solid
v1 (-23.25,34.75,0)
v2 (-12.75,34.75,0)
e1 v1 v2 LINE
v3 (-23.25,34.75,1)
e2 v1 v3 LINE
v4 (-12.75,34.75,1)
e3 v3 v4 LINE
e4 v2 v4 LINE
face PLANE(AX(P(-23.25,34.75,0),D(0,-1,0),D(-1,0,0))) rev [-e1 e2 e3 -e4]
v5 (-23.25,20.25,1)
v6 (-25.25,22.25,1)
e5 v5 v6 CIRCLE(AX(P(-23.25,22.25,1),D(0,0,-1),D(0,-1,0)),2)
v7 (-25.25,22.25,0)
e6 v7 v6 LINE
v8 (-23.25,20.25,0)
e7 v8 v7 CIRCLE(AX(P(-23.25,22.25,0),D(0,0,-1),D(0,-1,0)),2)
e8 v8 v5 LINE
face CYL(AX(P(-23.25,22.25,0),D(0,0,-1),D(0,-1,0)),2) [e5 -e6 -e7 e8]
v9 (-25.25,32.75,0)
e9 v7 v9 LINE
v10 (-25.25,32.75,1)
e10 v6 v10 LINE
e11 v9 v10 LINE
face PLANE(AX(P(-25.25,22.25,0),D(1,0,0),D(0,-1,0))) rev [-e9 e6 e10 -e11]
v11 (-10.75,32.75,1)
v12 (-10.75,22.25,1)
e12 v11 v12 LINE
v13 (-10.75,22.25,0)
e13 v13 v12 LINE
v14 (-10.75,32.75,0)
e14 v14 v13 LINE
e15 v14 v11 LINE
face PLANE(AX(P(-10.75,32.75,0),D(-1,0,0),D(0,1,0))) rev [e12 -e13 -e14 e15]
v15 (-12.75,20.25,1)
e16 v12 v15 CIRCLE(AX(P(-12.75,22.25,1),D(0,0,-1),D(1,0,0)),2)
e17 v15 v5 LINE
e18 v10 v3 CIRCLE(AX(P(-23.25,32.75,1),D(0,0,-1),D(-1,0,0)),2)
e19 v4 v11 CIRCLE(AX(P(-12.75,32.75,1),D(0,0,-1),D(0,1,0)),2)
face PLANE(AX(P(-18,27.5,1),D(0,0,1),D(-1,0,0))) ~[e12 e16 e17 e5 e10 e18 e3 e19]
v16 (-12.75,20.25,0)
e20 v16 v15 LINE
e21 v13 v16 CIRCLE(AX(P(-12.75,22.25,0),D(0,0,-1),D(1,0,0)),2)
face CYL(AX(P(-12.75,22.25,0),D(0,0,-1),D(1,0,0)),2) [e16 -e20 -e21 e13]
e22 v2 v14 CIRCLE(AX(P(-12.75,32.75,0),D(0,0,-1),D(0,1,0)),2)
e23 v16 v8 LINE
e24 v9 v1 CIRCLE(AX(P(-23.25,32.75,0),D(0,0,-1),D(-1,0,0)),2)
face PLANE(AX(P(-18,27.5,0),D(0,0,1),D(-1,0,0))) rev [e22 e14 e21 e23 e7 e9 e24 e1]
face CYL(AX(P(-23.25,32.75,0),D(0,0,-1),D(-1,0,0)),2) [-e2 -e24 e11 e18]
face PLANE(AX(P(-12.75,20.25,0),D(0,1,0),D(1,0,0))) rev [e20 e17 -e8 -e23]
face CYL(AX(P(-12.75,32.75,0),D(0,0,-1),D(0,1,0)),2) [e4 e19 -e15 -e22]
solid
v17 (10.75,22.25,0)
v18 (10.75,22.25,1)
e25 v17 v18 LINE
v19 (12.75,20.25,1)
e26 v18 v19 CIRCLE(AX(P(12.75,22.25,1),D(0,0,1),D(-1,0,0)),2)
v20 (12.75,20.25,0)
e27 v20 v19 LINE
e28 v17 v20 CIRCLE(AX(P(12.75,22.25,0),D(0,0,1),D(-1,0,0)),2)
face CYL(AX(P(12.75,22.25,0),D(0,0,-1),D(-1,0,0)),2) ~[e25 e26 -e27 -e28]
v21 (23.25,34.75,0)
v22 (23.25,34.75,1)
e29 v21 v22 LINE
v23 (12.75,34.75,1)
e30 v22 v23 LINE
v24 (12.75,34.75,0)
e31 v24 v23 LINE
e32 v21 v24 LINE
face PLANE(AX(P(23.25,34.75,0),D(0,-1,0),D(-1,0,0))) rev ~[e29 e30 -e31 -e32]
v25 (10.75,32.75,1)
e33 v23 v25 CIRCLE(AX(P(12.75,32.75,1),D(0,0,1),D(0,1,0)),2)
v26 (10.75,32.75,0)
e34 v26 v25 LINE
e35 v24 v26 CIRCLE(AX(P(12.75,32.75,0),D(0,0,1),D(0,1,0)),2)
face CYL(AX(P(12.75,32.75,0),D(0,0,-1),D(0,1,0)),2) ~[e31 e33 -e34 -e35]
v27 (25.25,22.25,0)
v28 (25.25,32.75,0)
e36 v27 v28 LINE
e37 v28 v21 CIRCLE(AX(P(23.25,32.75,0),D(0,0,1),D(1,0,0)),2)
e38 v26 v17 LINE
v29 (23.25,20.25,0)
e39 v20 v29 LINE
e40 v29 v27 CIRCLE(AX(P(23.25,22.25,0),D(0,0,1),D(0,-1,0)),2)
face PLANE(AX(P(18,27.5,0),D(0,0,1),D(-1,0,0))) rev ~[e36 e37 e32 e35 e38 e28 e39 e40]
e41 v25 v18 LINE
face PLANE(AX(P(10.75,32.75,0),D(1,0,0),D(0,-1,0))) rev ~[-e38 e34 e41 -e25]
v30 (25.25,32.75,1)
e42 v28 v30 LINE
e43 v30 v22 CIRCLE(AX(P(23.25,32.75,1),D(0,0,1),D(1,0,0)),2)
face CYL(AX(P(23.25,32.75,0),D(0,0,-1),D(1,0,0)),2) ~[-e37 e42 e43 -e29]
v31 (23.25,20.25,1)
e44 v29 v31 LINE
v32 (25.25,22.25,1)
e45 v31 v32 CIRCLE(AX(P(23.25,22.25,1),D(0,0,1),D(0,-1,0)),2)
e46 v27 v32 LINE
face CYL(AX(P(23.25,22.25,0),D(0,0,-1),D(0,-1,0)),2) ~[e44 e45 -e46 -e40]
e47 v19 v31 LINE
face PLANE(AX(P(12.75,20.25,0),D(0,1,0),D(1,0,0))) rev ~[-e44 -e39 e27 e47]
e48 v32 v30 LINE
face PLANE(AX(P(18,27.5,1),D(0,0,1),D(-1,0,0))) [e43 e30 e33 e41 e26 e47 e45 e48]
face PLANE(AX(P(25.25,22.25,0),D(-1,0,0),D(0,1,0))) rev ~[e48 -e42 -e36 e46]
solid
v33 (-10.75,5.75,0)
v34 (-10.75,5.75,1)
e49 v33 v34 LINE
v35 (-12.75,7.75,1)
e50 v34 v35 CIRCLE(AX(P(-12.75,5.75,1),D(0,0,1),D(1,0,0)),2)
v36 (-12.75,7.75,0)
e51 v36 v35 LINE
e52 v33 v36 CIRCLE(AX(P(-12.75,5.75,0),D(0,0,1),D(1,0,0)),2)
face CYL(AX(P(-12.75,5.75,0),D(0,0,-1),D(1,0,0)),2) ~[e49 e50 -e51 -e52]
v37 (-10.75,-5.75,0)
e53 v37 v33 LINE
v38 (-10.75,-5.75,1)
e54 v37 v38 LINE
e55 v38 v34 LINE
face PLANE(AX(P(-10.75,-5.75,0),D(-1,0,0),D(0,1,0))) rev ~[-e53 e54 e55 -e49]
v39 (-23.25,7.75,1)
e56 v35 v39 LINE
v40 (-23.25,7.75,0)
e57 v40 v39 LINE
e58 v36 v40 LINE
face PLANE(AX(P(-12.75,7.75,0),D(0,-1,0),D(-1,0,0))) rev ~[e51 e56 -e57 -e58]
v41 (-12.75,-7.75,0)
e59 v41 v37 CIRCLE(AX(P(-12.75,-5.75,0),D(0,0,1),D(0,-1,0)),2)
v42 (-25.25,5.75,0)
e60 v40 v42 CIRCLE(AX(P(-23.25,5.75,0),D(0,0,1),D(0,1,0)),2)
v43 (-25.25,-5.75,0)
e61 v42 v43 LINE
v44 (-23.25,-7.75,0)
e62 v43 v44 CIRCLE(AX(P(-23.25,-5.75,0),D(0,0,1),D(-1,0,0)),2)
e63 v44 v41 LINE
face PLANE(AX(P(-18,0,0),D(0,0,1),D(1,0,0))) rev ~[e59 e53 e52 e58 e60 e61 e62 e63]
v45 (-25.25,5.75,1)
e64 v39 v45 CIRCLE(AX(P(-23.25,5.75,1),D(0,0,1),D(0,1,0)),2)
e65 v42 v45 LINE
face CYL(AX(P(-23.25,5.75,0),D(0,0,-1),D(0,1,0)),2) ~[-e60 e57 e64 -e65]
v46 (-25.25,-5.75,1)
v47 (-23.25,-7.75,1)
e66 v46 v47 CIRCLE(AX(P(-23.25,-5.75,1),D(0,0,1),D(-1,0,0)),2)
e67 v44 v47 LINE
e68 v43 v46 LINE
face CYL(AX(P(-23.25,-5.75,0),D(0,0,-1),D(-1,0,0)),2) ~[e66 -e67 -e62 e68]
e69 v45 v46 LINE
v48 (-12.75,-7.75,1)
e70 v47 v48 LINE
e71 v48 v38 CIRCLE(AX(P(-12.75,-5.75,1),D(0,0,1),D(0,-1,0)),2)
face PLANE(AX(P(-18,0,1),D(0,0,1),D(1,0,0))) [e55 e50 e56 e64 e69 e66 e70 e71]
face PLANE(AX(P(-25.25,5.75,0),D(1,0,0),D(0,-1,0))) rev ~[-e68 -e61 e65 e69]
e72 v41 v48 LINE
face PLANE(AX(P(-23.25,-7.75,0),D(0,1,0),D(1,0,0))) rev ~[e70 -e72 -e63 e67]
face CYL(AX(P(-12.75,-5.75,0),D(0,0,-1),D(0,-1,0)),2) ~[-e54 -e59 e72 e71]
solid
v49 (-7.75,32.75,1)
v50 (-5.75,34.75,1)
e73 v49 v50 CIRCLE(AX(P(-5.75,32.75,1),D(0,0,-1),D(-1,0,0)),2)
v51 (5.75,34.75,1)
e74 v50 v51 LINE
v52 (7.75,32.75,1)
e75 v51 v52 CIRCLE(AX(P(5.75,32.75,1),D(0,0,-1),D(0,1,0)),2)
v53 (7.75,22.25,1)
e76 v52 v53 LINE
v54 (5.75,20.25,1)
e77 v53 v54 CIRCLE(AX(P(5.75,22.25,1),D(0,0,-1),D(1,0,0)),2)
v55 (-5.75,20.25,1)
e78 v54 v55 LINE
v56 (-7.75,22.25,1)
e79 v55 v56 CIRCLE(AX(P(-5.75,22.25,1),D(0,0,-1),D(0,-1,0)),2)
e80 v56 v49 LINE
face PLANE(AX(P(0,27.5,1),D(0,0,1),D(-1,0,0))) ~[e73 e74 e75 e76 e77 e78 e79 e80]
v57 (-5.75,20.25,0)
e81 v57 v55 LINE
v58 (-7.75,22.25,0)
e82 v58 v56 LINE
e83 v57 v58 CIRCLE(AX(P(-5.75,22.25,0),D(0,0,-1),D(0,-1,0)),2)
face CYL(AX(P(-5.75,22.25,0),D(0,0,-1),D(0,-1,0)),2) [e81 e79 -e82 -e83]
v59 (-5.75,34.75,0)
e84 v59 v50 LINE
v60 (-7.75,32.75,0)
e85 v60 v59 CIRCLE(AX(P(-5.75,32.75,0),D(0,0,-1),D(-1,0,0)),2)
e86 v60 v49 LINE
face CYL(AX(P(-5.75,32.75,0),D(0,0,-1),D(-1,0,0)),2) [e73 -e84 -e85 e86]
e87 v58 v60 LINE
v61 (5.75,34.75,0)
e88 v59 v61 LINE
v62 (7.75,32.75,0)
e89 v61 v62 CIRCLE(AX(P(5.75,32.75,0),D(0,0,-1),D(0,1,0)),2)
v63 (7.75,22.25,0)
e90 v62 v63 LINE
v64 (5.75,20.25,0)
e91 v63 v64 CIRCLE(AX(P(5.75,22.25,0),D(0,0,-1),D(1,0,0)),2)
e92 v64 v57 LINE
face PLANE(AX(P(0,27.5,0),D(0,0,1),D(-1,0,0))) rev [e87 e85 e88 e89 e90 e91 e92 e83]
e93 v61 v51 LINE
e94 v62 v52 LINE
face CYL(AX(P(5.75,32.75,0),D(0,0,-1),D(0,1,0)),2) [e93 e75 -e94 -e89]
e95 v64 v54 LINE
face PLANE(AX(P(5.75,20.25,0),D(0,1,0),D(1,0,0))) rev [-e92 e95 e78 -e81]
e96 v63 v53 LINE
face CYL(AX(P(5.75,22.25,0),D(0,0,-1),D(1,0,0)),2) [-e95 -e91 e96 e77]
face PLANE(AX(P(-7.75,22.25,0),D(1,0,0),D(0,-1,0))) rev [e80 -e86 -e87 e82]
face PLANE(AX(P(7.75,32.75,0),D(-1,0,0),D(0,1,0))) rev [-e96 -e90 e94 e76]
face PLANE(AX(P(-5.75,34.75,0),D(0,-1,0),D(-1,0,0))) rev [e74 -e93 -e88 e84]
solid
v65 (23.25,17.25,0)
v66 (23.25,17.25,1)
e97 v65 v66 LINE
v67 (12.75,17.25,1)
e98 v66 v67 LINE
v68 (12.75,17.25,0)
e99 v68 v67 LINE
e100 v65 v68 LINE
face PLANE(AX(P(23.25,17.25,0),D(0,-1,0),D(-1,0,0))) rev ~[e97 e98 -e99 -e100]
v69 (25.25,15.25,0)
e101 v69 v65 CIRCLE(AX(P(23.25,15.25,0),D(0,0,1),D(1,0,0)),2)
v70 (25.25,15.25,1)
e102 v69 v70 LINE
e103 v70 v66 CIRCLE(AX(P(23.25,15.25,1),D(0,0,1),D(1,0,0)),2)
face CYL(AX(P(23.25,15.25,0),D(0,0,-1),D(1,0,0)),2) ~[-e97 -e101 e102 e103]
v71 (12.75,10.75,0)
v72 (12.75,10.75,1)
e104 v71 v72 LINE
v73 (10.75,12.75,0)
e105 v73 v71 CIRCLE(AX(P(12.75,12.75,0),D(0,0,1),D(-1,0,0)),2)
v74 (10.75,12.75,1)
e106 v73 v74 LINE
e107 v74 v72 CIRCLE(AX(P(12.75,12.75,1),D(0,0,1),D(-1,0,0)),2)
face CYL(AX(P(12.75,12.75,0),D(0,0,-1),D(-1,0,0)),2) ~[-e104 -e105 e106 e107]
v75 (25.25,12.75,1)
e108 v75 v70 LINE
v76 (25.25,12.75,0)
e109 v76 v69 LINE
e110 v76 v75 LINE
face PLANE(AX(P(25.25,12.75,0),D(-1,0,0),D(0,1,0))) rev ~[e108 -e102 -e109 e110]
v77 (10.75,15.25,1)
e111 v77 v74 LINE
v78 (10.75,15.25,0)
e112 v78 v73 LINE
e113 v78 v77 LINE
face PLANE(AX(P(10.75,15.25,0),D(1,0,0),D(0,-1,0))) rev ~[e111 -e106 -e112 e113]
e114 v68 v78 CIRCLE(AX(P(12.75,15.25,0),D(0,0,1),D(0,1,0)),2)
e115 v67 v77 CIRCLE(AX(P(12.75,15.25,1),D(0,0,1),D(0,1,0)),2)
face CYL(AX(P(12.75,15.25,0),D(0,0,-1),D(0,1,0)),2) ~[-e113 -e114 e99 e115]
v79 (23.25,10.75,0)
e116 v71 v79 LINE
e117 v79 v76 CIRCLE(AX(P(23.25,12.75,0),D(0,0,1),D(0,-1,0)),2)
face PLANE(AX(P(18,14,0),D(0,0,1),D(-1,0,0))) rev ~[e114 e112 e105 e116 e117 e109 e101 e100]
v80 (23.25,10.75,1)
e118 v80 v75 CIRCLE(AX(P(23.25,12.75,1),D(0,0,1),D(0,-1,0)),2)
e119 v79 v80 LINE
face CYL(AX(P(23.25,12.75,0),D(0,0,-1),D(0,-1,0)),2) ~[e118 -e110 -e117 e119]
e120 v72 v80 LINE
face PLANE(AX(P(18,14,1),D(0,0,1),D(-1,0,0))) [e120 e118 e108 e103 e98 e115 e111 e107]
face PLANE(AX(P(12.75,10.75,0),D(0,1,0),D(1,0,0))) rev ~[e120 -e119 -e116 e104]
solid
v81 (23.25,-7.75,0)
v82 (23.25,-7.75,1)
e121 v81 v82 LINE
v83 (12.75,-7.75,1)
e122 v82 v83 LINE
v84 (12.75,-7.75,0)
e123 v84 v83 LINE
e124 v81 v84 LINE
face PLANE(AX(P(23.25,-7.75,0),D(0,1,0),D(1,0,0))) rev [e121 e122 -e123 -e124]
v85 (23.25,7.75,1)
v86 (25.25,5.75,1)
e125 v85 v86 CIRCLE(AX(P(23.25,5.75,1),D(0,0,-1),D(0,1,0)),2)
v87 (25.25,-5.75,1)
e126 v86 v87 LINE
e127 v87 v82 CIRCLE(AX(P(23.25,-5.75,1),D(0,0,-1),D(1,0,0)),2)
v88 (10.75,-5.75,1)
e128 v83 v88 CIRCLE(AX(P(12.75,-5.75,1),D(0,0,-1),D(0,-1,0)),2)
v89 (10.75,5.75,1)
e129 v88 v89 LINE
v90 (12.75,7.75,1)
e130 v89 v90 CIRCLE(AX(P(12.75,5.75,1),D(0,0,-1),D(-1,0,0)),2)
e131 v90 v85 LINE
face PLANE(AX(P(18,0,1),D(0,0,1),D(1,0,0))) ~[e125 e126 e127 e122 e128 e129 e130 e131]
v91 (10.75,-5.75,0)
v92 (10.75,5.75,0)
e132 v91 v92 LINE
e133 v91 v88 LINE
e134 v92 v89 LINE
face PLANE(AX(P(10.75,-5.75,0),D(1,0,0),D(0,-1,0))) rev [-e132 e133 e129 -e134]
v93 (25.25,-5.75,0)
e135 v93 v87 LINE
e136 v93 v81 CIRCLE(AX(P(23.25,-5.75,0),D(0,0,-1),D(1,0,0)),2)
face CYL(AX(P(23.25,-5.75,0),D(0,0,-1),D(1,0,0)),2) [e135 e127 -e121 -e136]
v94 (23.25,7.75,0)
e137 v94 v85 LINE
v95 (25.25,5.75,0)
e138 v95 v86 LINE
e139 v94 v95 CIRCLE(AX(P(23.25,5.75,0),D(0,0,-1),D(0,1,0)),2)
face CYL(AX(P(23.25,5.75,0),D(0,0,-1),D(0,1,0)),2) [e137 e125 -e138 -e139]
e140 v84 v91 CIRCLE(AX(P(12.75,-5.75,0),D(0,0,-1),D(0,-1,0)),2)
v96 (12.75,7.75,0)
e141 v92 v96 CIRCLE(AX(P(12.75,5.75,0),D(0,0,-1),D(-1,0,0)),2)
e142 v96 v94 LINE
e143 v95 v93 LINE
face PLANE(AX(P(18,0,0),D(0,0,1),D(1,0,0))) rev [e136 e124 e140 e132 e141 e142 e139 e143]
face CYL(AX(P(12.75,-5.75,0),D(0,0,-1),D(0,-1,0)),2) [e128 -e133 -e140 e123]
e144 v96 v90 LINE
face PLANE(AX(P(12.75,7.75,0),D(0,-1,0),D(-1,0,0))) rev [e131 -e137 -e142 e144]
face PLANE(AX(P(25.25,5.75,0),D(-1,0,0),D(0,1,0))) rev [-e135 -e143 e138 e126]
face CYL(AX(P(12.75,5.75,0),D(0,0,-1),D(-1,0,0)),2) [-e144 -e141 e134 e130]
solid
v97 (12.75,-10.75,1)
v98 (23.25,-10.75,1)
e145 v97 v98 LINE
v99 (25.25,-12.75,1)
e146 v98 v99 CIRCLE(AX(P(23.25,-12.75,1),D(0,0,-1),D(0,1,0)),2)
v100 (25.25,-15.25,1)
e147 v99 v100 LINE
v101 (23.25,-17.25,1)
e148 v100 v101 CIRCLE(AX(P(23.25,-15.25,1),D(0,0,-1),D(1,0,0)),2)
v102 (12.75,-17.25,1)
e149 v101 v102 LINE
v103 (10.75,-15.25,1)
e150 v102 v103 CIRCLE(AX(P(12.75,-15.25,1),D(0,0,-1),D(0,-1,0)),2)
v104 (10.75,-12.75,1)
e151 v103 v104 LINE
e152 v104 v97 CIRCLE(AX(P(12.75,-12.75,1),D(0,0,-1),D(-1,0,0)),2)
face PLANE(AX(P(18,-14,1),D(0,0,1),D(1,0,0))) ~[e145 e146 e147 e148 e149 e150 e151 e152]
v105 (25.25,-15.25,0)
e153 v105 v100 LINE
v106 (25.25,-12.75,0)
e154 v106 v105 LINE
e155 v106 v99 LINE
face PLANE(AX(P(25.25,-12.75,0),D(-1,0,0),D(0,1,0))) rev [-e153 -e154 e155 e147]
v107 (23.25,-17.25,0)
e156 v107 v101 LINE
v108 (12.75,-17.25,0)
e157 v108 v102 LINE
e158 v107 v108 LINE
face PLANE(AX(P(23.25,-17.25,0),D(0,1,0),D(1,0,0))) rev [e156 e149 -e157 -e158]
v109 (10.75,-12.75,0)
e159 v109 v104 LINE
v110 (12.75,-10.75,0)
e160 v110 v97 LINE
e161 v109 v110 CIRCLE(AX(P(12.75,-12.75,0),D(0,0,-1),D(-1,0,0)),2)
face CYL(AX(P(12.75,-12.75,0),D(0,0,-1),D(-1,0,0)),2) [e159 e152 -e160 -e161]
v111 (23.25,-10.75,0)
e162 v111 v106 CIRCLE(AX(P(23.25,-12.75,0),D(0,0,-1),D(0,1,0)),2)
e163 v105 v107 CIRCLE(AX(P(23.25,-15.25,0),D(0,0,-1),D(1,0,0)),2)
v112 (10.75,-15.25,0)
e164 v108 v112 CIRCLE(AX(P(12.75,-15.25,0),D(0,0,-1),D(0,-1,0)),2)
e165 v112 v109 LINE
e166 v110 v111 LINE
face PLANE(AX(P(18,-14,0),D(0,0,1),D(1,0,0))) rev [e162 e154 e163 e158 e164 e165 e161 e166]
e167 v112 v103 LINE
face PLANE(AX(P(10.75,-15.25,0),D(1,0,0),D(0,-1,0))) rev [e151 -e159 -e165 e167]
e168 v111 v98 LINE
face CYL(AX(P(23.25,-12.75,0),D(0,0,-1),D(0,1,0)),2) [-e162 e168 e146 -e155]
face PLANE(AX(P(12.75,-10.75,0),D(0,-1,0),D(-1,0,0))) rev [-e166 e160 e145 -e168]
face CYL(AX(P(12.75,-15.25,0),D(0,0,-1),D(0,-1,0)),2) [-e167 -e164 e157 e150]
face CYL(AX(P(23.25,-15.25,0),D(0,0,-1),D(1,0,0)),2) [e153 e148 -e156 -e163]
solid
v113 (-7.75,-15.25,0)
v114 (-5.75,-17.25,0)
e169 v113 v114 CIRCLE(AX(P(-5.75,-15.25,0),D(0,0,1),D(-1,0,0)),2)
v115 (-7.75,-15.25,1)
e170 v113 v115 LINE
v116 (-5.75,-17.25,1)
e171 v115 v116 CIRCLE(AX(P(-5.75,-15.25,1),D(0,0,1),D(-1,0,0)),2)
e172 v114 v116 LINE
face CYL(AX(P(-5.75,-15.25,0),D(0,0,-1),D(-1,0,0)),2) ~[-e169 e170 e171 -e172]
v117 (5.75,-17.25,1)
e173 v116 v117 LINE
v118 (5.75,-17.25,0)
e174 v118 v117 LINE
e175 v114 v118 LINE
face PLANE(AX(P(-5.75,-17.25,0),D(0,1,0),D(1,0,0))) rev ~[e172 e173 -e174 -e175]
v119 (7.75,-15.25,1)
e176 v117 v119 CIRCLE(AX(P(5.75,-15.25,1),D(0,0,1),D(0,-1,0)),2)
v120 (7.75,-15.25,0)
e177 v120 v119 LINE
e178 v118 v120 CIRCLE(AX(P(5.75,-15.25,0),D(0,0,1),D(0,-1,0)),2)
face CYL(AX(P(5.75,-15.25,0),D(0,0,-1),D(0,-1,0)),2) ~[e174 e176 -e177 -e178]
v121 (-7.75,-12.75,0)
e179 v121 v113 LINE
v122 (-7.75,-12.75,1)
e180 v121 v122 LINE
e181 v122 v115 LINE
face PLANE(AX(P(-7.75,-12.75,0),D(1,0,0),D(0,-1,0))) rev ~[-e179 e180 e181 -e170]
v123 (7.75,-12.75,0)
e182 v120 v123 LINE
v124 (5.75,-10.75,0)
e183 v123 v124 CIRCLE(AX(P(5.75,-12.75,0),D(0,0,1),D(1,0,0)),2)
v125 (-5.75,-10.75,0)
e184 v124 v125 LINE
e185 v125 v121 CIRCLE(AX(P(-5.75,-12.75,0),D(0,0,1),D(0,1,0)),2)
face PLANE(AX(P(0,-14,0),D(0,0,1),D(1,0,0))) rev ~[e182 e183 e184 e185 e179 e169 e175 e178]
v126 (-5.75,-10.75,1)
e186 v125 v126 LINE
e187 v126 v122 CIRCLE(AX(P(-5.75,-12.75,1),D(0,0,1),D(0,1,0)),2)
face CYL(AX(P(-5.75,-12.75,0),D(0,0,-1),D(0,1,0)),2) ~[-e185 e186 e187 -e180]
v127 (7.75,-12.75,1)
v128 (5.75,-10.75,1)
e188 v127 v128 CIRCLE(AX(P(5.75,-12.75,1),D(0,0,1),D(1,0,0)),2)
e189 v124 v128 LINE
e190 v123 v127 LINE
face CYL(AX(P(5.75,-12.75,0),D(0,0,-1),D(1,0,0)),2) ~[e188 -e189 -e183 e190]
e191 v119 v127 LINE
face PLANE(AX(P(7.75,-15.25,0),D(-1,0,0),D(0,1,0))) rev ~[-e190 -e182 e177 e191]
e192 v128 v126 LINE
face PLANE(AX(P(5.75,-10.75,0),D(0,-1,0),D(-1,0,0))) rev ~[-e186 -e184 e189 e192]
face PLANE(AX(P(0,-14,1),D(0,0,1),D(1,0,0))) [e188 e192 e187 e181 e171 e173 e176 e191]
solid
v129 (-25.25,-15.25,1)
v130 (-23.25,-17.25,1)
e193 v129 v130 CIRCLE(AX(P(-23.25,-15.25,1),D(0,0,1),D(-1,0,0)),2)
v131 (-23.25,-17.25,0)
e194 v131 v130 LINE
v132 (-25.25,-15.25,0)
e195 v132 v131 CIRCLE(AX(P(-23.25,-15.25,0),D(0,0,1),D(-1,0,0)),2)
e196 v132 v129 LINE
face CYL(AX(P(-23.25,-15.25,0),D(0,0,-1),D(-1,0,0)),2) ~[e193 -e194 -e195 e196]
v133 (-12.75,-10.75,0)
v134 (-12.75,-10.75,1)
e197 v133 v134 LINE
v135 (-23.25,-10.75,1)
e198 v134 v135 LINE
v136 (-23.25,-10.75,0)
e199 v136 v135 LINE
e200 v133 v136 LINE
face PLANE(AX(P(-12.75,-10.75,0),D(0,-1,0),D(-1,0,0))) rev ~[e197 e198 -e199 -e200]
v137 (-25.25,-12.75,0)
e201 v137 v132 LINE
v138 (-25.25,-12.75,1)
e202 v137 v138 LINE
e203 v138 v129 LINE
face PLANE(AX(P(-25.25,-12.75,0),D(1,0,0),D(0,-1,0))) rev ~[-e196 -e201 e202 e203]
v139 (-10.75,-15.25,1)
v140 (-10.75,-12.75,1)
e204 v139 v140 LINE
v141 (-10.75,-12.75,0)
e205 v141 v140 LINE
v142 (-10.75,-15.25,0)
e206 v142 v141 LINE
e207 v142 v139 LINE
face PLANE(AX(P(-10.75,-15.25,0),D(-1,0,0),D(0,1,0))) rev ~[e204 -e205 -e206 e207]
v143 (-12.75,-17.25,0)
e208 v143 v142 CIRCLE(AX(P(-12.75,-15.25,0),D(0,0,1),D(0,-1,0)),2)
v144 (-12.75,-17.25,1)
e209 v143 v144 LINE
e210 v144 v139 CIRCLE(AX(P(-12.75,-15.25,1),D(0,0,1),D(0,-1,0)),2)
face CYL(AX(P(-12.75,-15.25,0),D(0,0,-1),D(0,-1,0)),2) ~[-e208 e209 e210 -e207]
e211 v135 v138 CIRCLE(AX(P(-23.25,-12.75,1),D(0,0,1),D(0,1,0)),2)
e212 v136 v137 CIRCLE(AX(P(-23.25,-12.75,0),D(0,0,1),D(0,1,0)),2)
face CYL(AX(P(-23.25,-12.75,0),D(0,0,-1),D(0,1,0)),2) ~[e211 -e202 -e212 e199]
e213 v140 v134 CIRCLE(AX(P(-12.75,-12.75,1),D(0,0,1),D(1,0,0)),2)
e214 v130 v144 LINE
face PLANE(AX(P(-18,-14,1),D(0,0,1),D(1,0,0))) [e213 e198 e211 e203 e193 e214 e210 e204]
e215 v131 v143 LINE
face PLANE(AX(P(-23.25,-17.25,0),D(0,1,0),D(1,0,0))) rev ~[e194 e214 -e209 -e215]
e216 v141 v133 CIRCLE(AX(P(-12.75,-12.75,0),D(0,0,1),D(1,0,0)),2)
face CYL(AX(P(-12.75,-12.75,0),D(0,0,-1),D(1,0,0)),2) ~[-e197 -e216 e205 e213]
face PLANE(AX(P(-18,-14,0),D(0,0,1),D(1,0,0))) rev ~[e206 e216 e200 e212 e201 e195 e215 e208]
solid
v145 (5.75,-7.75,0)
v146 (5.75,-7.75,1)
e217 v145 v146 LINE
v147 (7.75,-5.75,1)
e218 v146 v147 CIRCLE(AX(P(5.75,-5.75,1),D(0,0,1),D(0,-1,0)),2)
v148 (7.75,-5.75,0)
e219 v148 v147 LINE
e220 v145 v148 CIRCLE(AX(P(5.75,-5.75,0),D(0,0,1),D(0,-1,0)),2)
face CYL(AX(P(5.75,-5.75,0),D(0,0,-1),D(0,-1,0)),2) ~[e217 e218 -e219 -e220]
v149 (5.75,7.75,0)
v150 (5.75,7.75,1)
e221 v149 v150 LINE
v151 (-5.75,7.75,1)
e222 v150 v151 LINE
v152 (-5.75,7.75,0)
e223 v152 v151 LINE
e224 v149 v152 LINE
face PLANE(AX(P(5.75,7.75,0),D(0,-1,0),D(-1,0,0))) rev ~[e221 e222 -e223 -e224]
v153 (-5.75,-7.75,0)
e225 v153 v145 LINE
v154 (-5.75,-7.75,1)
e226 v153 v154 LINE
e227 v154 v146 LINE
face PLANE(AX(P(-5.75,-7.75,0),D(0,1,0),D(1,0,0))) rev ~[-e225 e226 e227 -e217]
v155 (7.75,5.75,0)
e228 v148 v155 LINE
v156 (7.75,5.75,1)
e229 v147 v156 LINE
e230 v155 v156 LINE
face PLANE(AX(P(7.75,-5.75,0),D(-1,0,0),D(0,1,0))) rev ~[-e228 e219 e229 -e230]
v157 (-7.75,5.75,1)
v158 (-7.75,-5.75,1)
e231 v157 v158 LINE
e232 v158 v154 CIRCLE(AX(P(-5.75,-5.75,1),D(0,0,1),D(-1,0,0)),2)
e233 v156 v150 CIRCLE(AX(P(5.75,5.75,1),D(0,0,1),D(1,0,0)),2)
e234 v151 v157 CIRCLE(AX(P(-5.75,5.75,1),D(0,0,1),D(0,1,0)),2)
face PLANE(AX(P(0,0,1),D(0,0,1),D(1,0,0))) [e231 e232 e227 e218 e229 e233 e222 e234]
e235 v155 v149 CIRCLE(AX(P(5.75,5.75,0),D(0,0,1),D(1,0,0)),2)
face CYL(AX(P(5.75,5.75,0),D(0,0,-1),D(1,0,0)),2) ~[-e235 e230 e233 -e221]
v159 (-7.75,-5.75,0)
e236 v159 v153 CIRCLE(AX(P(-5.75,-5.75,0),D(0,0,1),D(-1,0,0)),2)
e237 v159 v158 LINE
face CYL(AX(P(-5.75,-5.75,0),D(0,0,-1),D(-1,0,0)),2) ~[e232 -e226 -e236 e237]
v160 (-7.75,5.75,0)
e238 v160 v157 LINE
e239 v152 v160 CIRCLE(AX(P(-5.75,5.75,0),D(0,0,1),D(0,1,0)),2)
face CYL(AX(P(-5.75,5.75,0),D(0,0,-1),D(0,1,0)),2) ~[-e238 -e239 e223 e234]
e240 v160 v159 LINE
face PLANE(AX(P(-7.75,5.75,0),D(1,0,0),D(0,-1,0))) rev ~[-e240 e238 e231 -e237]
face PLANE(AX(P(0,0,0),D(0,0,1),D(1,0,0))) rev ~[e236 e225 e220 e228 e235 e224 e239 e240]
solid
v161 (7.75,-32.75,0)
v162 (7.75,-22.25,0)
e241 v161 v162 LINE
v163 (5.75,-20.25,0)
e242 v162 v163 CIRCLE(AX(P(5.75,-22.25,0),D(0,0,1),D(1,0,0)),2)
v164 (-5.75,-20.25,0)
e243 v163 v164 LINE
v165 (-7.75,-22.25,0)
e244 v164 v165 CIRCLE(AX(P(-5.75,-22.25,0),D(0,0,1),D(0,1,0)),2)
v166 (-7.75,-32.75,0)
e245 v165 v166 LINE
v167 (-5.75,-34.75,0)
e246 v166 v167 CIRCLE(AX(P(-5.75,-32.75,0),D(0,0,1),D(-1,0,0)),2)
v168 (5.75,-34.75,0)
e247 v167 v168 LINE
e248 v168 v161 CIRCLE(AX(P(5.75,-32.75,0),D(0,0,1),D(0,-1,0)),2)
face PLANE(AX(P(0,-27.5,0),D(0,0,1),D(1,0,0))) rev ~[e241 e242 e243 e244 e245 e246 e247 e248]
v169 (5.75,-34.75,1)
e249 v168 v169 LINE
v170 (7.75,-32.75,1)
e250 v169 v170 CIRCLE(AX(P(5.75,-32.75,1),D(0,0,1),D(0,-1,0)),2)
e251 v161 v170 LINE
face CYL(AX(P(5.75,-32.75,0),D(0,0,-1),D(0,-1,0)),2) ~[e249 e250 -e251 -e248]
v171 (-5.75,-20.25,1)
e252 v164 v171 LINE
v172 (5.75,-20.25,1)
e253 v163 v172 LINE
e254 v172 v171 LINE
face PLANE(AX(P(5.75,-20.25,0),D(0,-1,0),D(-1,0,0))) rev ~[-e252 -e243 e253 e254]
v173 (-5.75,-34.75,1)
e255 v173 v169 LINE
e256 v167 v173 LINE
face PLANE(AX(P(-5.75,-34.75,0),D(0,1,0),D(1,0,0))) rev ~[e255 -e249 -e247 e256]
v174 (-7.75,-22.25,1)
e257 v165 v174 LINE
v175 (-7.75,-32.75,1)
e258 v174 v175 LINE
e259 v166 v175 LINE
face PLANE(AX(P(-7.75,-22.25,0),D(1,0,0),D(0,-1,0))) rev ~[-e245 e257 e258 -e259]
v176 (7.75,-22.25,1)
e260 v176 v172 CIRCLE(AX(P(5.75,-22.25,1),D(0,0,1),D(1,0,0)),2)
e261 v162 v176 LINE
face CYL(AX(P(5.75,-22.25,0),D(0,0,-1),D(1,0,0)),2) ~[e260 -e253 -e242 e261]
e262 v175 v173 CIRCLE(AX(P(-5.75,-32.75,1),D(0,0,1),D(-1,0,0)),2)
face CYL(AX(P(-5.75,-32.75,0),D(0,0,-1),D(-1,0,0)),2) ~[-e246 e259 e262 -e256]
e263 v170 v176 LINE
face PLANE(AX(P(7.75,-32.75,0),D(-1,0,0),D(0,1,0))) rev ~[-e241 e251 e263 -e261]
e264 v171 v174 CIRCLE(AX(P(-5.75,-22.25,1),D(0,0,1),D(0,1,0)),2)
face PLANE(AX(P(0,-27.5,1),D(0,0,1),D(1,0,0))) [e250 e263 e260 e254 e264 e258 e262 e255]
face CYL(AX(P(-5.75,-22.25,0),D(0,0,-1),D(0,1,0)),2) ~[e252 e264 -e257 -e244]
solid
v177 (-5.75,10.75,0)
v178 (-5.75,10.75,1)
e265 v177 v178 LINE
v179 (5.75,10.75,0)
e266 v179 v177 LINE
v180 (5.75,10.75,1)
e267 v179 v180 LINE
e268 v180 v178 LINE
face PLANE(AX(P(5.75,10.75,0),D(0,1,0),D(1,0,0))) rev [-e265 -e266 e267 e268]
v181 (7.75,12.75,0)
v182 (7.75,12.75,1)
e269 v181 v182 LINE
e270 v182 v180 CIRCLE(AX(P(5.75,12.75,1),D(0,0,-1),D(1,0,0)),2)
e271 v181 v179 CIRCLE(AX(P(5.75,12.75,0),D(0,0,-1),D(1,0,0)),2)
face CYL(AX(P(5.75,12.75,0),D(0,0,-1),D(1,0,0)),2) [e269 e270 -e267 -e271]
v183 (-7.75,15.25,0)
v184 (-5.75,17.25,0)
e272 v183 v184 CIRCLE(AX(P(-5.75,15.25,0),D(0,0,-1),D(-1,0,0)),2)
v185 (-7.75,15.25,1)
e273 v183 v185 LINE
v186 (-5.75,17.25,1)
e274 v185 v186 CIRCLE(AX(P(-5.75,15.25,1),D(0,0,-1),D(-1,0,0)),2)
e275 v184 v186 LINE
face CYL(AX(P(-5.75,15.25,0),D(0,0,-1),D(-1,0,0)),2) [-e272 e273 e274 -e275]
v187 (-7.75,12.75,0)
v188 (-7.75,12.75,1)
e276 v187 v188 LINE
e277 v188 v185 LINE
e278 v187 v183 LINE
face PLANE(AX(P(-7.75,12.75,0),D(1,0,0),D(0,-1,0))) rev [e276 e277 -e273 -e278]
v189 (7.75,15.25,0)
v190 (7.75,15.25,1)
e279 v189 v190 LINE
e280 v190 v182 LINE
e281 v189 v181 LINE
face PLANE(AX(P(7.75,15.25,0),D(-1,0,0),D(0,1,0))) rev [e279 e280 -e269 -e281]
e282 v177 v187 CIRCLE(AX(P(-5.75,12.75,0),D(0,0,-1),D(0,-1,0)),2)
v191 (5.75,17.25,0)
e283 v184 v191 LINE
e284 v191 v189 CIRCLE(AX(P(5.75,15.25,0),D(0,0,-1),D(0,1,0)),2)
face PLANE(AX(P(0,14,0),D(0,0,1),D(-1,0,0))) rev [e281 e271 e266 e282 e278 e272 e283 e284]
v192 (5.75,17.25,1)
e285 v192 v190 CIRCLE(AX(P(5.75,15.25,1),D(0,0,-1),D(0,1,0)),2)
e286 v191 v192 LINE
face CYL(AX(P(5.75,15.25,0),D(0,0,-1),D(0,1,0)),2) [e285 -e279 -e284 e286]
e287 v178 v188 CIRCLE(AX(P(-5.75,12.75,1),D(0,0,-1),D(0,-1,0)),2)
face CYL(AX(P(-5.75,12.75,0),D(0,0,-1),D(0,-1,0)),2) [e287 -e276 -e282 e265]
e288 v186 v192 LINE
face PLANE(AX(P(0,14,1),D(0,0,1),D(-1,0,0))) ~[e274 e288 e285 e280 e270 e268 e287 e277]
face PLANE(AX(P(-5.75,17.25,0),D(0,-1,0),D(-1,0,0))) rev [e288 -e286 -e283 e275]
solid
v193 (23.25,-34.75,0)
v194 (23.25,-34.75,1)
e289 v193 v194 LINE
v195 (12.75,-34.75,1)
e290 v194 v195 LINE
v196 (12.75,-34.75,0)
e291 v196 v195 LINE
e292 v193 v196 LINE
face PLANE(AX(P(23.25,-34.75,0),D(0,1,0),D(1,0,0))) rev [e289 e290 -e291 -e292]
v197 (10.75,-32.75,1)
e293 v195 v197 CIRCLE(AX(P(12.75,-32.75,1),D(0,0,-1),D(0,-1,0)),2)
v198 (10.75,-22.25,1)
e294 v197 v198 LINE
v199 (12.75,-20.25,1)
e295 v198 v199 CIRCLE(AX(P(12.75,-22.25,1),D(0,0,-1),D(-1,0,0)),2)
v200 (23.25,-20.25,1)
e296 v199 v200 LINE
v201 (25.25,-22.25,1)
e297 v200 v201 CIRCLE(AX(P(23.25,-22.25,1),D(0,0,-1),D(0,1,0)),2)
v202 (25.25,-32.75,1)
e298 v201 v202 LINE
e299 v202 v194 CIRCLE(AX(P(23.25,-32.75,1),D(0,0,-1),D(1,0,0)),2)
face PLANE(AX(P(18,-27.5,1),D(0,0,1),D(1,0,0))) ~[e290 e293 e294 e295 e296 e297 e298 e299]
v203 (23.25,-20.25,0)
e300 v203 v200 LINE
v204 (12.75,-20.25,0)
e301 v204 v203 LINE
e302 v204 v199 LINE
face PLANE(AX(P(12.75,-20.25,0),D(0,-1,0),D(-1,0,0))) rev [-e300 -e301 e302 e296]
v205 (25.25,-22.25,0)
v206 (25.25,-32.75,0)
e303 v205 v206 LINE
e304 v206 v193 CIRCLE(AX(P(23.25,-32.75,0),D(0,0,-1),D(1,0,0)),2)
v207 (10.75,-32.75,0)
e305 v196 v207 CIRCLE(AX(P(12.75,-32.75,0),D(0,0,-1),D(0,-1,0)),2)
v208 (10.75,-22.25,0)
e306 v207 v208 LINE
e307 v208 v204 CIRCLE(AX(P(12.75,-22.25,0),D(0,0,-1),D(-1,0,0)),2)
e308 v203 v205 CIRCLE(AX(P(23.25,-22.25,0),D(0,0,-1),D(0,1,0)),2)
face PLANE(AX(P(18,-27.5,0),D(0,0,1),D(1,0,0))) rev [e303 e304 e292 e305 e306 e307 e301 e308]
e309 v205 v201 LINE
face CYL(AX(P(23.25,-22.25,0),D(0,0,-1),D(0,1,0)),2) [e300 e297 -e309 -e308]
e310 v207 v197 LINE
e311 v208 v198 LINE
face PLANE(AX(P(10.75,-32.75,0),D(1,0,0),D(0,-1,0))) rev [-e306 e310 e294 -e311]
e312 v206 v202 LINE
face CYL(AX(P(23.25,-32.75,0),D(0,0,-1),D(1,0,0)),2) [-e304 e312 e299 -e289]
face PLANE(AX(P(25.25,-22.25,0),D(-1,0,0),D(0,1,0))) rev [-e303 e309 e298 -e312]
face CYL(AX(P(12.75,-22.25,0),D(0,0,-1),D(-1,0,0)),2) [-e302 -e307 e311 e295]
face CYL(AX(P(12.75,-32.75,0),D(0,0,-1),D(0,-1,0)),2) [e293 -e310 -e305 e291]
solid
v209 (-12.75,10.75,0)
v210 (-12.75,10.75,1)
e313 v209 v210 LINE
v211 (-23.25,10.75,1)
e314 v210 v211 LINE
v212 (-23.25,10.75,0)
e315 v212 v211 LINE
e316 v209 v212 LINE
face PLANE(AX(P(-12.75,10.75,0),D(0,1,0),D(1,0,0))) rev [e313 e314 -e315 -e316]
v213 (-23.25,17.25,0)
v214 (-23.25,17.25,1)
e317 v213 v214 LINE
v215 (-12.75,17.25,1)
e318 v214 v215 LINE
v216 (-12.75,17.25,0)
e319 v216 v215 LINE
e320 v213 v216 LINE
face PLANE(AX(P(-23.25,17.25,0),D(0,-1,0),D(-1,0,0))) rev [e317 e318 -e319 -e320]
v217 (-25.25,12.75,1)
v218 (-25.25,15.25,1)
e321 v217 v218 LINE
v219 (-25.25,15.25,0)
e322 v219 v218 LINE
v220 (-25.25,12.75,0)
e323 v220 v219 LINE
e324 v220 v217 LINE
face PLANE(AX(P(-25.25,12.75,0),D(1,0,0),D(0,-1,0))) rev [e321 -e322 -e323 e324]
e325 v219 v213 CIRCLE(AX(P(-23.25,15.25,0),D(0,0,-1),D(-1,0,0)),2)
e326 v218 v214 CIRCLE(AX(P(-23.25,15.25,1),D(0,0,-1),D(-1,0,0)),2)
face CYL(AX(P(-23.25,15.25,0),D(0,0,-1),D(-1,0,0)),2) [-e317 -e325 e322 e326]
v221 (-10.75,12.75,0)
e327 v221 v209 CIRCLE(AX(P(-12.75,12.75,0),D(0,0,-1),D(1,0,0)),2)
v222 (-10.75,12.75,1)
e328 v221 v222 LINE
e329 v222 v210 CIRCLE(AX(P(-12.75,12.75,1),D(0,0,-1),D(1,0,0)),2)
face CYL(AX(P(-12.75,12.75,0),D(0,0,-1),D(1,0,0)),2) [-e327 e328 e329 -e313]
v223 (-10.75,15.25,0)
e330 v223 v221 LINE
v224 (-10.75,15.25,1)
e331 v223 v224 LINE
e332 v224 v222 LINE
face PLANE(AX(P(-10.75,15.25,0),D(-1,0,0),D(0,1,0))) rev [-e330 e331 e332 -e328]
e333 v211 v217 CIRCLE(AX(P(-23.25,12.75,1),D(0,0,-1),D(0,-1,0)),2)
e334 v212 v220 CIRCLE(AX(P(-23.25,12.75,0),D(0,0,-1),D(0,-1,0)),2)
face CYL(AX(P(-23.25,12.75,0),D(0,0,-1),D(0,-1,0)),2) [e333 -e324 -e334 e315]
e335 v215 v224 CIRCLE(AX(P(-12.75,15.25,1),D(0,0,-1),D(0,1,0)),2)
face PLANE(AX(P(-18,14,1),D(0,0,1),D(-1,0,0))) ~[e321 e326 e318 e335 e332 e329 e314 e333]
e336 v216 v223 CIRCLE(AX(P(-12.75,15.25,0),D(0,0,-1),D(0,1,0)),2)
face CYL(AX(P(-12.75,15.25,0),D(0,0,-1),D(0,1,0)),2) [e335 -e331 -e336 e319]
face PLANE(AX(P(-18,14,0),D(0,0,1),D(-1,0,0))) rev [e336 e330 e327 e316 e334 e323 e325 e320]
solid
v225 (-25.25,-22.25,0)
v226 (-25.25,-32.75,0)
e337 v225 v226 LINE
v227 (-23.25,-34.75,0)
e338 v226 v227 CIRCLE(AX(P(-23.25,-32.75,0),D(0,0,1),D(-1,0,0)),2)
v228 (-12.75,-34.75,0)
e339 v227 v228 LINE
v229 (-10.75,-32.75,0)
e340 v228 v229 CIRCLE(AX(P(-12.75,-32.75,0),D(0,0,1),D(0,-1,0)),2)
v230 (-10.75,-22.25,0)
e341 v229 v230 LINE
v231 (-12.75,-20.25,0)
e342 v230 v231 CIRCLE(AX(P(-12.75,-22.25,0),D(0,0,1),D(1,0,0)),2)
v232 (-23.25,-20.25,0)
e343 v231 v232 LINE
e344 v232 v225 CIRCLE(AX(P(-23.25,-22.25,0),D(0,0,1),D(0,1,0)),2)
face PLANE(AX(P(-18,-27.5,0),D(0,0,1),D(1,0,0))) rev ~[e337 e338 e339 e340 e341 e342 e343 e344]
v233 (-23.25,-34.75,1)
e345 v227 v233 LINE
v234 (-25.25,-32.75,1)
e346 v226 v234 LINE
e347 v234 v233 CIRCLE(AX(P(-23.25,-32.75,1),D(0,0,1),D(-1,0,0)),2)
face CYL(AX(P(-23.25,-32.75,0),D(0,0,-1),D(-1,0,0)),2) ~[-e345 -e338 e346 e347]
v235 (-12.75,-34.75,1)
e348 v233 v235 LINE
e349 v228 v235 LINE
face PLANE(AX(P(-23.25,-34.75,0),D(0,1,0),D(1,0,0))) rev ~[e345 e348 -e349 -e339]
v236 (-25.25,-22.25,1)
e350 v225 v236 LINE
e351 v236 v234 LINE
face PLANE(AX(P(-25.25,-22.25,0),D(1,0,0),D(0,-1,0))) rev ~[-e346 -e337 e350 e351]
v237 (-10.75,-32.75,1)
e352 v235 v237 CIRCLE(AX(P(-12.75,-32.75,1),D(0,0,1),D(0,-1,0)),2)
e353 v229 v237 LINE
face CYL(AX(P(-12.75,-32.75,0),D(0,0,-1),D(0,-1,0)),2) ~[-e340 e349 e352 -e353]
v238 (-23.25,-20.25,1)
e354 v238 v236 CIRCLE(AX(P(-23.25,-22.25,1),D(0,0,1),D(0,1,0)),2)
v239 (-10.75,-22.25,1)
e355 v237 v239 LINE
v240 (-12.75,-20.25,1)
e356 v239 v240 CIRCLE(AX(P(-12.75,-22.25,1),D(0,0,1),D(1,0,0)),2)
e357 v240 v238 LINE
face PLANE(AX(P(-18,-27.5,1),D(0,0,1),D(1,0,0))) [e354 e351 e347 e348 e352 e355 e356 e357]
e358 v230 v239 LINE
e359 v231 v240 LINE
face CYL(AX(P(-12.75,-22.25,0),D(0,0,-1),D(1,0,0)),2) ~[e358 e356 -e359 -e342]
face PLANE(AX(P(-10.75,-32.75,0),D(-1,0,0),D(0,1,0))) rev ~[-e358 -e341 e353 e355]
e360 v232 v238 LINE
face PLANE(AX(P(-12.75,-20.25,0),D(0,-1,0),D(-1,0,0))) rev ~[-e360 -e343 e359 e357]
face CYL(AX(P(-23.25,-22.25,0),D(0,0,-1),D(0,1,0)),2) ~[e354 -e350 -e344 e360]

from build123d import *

# Parameters (mm, degrees)
F1_DEPTH = 1


with BuildPart() as f1:
    # F0 (on Top) → F1 (new body)
    with BuildSketch(Plane.XY):
        with BuildLine():
            ThreePointArc((7.75, 5.75), (7.1642135624, 7.1642135624), (5.75, 7.75))
            Line((5.75, 7.75), (-5.75, 7.75))
            ThreePointArc((-5.75, 7.75), (-7.1642135624, 7.1642135624), (-7.75, 5.75))
            Line((-7.75, 5.75), (-7.75, -5.75))
            ThreePointArc((-7.75, -5.75), (-7.1642135624, -7.1642135624), (-5.75, -7.75))
            Line((-5.75, -7.75), (5.75, -7.75))
            ThreePointArc((5.75, -7.75), (7.1642135624, -7.1642135624), (7.75, -5.75))
            Line((7.75, -5.75), (7.75, 5.75))
        make_face()
    extrude(amount=F1_DEPTH)


with BuildPart() as f1b:
    # F0 (on Top) → F1, piece 2 (new body)
    with BuildSketch(Plane.XY):
        with BuildLine():
            Line((5.75, -10.75), (-5.75, -10.75))
            ThreePointArc((-5.75, -10.75), (-7.1642135624, -11.3357864376), (-7.75, -12.75))
            Line((-7.75, -12.75), (-7.75, -15.25))
            ThreePointArc((-7.75, -15.25), (-7.1642135624, -16.6642135624), (-5.75, -17.25))
            Line((-5.75, -17.25), (5.75, -17.25))
            ThreePointArc((5.75, -17.25), (7.1642135624, -16.6642135624), (7.75, -15.25))
            Line((7.75, -15.25), (7.75, -12.75))
            ThreePointArc((7.75, -12.75), (7.1642135624, -11.3357864376), (5.75, -10.75))
        make_face()
    extrude(amount=F1_DEPTH)


with BuildPart() as f1c:
    # F0 (on Top) → F1, piece 3 (new body)
    with BuildSketch(Plane.XY):
        with BuildLine():
            ThreePointArc((-10.75, 5.75), (-11.3357864376, 7.1642135624), (-12.75, 7.75))
            Line((-12.75, 7.75), (-23.25, 7.75))
            ThreePointArc((-23.25, 7.75), (-24.6642135624, 7.1642135624), (-25.25, 5.75))
            Line((-25.25, 5.75), (-25.25, -5.75))
            ThreePointArc((-25.25, -5.75), (-24.6642135624, -7.1642135624), (-23.25, -7.75))
            Line((-23.25, -7.75), (-12.75, -7.75))
            ThreePointArc((-12.75, -7.75), (-11.3357864376, -7.1642135624), (-10.75, -5.75))
            Line((-10.75, -5.75), (-10.75, 5.75))
        make_face()
    extrude(amount=F1_DEPTH)


with BuildPart() as f1d:
    # F0 (on Top) → F1, piece 4 (new body)
    with BuildSketch(Plane.XY):
        with BuildLine():
            Line((-12.75, -10.75), (-23.25, -10.75))
            ThreePointArc((-23.25, -10.75), (-24.6642135624, -11.3357864376), (-25.25, -12.75))
            Line((-25.25, -12.75), (-25.25, -15.25))
            ThreePointArc((-25.25, -15.25), (-24.6642135624, -16.6642135624), (-23.25, -17.25))
            Line((-23.25, -17.25), (-12.75, -17.25))
            ThreePointArc((-12.75, -17.25), (-11.3357864376, -16.6642135624), (-10.75, -15.25))
            Line((-10.75, -15.25), (-10.75, -12.75))
            ThreePointArc((-10.75, -12.75), (-11.3357864376, -11.3357864376), (-12.75, -10.75))
        make_face()
    extrude(amount=F1_DEPTH)


with BuildPart() as f1e:
    # F0 (on Top) → F1, piece 5 (new body)
    with BuildSketch(Plane.XY):
        with BuildLine():
            Line((-12.75, -20.25), (-23.25, -20.25))
            ThreePointArc((-23.25, -20.25), (-24.6642135624, -20.8357864376), (-25.25, -22.25))
            Line((-25.25, -22.25), (-25.25, -32.75))
            ThreePointArc((-25.25, -32.75), (-24.6642135624, -34.1642135624), (-23.25, -34.75))
            Line((-23.25, -34.75), (-12.75, -34.75))
            ThreePointArc((-12.75, -34.75), (-11.3357864376, -34.1642135624), (-10.75, -32.75))
            Line((-10.75, -32.75), (-10.75, -22.25))
            ThreePointArc((-10.75, -22.25), (-11.3357864376, -20.8357864376), (-12.75, -20.25))
        make_face()
    extrude(amount=F1_DEPTH)


with BuildPart() as f1f:
    # F0 (on Top) → F1, piece 6 (new body)
    with BuildSketch(Plane.XY):
        with BuildLine():
            Line((5.75, -20.25), (-5.75, -20.25))
            ThreePointArc((-5.75, -20.25), (-7.1642135624, -20.8357864376), (-7.75, -22.25))
            Line((-7.75, -22.25), (-7.75, -32.75))
            ThreePointArc((-7.75, -32.75), (-7.1642135624, -34.1642135624), (-5.75, -34.75))
            Line((-5.75, -34.75), (5.75, -34.75))
            ThreePointArc((5.75, -34.75), (7.1642135624, -34.1642135624), (7.75, -32.75))
            Line((7.75, -32.75), (7.75, -22.25))
            ThreePointArc((7.75, -22.25), (7.1642135624, -20.8357864376), (5.75, -20.25))
        make_face()
    extrude(amount=F1_DEPTH)


with BuildPart() as f2_1:
    # F2: instance of F1c
    add(f1c.part.mirror(Plane.YZ))


with BuildPart() as f2_2:
    # F2: instance of F1d
    add(f1d.part.mirror(Plane.YZ))


with BuildPart() as f2_3:
    # F2: instance of F1e
    add(f1e.part.mirror(Plane.YZ))


with BuildPart() as f3_1:
    # F3: instance of F1d
    add(f1d.part.mirror(Plane.XZ))


with BuildPart() as f3_2:
    # F3: instance of F1e
    add(f1e.part.mirror(Plane.XZ))


with BuildPart() as f3_3:
    # F3: instance of F1f
    add(f1f.part.mirror(Plane.XZ))


with BuildPart() as f3_4:
    # F3: instance of F1b
    add(f1b.part.mirror(Plane.XZ))


with BuildPart() as f3_5:
    # F3: instance of F2_2
    add(f2_2.part.mirror(Plane.XZ))


with BuildPart() as f3_6:
    # F3: instance of F2_3
    add(f2_3.part.mirror(Plane.XZ))


solid = Compound([f1.part, f1b.part, f1c.part, f1d.part, f1e.part, f1f.part, f2_1.part, f2_2.part, f2_3.part, f3_1.part, f3_2.part, f3_3.part, f3_4.part, f3_5.part, f3_6.part])
